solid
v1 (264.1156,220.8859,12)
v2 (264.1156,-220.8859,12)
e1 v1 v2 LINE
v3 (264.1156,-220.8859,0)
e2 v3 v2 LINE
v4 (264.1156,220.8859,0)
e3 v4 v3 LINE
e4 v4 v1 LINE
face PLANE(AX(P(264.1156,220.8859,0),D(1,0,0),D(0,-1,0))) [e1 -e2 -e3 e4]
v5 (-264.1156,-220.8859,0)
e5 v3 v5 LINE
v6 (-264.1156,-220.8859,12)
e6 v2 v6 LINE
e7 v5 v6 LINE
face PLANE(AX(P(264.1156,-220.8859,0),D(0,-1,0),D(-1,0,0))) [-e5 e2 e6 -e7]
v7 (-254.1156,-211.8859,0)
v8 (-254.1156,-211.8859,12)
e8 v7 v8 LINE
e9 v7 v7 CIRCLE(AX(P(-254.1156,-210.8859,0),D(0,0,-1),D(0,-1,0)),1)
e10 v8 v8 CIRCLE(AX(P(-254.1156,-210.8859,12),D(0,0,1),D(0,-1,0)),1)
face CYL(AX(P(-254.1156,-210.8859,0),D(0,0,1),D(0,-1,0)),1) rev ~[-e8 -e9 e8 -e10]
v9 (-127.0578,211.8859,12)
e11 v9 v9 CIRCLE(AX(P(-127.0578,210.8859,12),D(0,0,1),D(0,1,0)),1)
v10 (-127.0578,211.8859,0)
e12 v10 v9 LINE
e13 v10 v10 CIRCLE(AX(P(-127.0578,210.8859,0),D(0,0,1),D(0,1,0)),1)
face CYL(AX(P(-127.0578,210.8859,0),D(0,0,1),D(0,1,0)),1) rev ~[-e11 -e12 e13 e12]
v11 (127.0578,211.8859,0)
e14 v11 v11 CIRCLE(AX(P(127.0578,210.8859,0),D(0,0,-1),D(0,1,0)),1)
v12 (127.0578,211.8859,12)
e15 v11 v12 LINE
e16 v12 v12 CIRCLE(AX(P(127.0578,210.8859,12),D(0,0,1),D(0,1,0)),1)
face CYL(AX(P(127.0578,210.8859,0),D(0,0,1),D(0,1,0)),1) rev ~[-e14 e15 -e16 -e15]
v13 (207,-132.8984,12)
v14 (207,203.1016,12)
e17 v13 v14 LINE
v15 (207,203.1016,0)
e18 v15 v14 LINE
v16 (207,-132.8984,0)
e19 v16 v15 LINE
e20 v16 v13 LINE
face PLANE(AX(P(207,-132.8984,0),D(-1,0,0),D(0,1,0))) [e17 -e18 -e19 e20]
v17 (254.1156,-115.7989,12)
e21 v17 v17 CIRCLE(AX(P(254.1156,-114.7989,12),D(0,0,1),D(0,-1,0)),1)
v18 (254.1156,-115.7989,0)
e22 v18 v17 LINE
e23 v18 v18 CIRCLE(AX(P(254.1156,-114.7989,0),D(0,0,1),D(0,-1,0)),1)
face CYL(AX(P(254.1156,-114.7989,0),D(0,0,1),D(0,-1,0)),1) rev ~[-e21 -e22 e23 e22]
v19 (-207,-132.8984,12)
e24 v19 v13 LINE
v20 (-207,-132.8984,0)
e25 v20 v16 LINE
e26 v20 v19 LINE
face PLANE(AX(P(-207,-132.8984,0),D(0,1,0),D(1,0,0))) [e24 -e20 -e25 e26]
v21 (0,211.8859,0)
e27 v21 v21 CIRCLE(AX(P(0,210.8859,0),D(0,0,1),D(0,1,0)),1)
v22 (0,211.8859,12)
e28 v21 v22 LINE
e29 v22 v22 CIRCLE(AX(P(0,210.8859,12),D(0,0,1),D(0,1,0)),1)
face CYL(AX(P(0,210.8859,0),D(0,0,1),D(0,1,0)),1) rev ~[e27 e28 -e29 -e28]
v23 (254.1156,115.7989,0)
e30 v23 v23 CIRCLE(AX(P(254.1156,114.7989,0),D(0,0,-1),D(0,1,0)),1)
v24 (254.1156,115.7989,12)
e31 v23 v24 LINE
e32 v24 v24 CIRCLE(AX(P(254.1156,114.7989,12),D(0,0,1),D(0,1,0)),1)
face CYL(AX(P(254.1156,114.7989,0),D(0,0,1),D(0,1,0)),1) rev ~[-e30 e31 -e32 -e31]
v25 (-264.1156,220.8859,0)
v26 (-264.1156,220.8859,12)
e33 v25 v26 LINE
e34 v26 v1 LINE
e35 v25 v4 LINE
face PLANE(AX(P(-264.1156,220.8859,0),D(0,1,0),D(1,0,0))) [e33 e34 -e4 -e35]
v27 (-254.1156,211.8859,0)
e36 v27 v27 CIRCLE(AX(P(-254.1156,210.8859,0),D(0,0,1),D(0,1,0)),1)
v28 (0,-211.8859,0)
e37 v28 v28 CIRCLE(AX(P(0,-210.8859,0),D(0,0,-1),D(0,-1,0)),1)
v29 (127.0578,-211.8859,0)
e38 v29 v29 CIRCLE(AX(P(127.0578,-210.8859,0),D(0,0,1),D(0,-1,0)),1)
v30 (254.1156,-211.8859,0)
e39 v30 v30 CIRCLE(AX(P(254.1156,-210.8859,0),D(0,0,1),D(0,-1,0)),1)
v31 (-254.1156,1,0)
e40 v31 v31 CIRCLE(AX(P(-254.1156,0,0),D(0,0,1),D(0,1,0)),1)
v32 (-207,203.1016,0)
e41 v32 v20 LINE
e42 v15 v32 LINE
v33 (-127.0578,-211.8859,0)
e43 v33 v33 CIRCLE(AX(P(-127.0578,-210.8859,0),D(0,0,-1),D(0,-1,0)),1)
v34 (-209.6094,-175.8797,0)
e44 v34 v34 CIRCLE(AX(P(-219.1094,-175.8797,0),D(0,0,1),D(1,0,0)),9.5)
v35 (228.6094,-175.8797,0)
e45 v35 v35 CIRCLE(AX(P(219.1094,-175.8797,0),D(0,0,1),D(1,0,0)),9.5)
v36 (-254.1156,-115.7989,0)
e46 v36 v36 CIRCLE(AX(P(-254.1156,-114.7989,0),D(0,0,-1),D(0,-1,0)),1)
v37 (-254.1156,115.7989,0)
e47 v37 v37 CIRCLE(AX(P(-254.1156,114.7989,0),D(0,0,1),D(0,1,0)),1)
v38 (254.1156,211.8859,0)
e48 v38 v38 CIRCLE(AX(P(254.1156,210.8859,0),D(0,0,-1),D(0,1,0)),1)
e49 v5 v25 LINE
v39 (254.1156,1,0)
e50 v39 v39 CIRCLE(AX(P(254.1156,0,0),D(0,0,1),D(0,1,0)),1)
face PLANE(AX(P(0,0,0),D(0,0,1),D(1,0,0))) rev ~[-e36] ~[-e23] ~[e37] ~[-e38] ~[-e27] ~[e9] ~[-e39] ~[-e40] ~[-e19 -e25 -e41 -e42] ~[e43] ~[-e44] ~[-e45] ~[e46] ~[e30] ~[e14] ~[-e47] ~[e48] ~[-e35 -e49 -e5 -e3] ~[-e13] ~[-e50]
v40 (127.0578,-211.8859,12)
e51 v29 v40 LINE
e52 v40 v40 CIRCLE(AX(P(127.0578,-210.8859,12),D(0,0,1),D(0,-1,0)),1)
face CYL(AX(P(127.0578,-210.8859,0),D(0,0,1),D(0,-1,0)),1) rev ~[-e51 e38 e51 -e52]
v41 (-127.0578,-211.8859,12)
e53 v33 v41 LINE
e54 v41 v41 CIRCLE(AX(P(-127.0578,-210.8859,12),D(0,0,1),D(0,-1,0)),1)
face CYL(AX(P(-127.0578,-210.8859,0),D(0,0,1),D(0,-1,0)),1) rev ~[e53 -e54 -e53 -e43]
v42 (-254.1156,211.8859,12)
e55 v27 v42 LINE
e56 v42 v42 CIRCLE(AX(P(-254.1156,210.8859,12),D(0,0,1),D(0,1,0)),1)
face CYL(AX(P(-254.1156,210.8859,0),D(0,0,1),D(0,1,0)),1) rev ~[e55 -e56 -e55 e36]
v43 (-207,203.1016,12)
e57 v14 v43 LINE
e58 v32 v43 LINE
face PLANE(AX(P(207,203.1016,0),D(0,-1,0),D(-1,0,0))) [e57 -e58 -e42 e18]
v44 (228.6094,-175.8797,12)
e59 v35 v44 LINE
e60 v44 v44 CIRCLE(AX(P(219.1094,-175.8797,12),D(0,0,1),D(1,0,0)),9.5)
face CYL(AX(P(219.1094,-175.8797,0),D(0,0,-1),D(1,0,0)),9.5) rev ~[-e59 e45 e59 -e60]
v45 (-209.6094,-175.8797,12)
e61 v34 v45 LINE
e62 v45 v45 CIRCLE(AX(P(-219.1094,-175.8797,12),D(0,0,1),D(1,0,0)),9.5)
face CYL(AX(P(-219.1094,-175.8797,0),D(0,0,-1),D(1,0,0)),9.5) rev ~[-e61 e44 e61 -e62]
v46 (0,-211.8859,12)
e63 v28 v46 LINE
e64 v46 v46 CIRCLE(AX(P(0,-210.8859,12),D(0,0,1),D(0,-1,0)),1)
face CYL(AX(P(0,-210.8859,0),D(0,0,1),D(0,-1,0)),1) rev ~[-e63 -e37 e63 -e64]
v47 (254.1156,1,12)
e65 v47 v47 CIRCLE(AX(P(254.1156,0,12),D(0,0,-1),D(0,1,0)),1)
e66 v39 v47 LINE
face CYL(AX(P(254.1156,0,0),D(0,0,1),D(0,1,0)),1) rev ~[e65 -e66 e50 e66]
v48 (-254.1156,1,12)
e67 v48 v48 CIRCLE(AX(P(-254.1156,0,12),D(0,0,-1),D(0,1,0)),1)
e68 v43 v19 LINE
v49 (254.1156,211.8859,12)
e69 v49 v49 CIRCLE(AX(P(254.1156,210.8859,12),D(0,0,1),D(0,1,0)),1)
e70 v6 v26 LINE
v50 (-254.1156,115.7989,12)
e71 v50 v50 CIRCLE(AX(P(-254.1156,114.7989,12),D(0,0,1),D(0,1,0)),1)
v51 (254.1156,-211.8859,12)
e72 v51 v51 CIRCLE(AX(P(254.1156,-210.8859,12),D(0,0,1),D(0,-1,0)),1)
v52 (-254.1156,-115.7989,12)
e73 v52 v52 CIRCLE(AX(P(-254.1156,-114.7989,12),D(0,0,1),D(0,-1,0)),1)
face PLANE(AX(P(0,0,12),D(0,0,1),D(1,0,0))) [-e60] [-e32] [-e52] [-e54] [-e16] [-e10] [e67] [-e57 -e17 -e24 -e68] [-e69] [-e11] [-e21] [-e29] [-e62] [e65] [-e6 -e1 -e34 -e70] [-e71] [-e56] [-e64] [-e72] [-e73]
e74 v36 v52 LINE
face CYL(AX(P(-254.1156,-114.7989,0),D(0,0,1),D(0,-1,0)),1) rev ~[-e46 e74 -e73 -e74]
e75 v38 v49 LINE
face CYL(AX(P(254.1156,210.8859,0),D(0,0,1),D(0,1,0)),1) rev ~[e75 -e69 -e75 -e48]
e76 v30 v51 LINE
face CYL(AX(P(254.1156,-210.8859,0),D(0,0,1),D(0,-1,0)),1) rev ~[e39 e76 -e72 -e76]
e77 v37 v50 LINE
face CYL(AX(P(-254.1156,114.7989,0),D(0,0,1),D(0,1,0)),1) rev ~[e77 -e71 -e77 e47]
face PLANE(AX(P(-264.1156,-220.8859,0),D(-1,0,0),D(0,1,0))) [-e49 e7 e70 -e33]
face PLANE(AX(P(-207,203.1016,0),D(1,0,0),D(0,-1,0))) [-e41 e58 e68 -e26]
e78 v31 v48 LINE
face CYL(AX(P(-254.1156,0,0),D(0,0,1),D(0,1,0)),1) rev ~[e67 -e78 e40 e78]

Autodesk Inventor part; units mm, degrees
ref_plane "YZ Plane" through (0, 0, 0) normal (1, 0, 0) x (0, 1, 0)
ref_plane "XZ Plane" through (0, 0, 0) normal (0, 1, 0) x (-1, 0, 0)
ref_plane "XY Plane" through (0, 0, 0) normal (0, 0, 1) x (1, 0, 0)
sketch "Sketch1" plane through (0, 0, 0) normal (0, 0, 1) x (1, 0, 0)
  circle A0 centre (-219.1094, -175.8797) radius 11.5 projected
  circle A1 centre (219.1094, -175.8797) radius 11.5 projected
  line L0 (264.1156, -220.8859) -> (-264.1156, -220.8859) projected
  line L1 (264.1156, 220.8859) -> (264.1156, -220.8859) projected
  line L2 (-264.1156, 220.8859) -> (264.1156, 220.8859) projected
  line L3 (-264.1156, -220.8859) -> (-264.1156, 220.8859) projected
  line L4 (200, 196.1016) -> (-200, 196.1016) projected
  line L5 (200, -131.8984) -> (200, 196.1016) projected
  line L6 (-200, -131.8984) -> (200, -131.8984) projected
  line L7 (-200, 196.1016) -> (-200, -131.8984) projected
  line L8 (139, 202.1016) -> (119, 202.1016) projected
  line L9 (206, 187.0016) -> (206, 167.0016) projected
  line L10 (-206, 187.0016) -> (-206, 167.0016) projected
  line L11 (-206, -102.7984) -> (-206, -122.7984) projected
  line L12 (206, -122.7984) -> (206, -102.7984) projected
  line L13 (-206, 202.1016) -> (206, 202.1016)
  line L14 (206, 202.1016) -> (206, -131.8984)
  line L15 (206, -131.8984) -> (-206, -131.8984)
  line L16 (-206, -131.8984) -> (-206, 202.1016)
  line L17 (207, 203.1016) -> (-207, 203.1016)
  line L18 (-207, 203.1016) -> (-207, -132.8984)
  line L19 (-207, -132.8984) -> (207, -132.8984)
  line L20 (207, -132.8984) -> (207, 203.1016)
  circle A2 centre (219.1094, -175.8797) radius 9.5 projected
  circle A3 centre (-219.1094, -175.8797) radius 9.5 projected
  circle A4 centre (-219.1094, -175.8797) radius 11.5 projected
  circle A5 centre (-219.1094, -175.8797) radius 11.5 projected
  circle A6 centre (-219.1094, -175.8797) radius 11.5 projected
  point P0 (0, 0)
  dimension "d0" = 1
extrude "Extrusion1" add sketch "Sketch1" along normal blind 12 contours A0 | A1 | L0 L3 L2 L1
sketch "Sketch2" plane through (0, 0, 0) normal (0, 0, -1) x (-1, 0, 0)
  line L0 (0, 210.8859) -> (254.1156, 210.8859) construction
  line L1 (254.1156, 210.8859) -> (254.1156, 0) construction
  line L2 (254.1156, 0) -> (0, 0) construction
  line L3 (0, 0) -> (0, 210.8859) construction
  line L4 (-264.1156, 220.8859) -> (264.1156, 220.8859) construction
  line L5 (264.1156, 220.8859) -> (264.1156, -220.8859) construction
  point P0 (127.0578, 210.8859)
  point P1 (254.1156, 114.7989)
  dimension "d3" = 10
  dimension "d4" = 10
hole "Hole1" at (0, 210.8859, 0) at (-127.0578, 210.8859, 0) at (-254.1156, 210.8859, 0) at (-254.1156, 114.7989, 0) at (-254.1156, 0, 0) direction (0, 0, 1) diameter 2 end through all
mirror "Mirror1" about plane through (0, 0, 0) normal (1, 0, 0) of "Hole1"
mirror "Mirror2" about plane through (0, 0, 0) normal (0, 1, 0) of "Hole1", "Mirror1"
properties part number "lag3"
